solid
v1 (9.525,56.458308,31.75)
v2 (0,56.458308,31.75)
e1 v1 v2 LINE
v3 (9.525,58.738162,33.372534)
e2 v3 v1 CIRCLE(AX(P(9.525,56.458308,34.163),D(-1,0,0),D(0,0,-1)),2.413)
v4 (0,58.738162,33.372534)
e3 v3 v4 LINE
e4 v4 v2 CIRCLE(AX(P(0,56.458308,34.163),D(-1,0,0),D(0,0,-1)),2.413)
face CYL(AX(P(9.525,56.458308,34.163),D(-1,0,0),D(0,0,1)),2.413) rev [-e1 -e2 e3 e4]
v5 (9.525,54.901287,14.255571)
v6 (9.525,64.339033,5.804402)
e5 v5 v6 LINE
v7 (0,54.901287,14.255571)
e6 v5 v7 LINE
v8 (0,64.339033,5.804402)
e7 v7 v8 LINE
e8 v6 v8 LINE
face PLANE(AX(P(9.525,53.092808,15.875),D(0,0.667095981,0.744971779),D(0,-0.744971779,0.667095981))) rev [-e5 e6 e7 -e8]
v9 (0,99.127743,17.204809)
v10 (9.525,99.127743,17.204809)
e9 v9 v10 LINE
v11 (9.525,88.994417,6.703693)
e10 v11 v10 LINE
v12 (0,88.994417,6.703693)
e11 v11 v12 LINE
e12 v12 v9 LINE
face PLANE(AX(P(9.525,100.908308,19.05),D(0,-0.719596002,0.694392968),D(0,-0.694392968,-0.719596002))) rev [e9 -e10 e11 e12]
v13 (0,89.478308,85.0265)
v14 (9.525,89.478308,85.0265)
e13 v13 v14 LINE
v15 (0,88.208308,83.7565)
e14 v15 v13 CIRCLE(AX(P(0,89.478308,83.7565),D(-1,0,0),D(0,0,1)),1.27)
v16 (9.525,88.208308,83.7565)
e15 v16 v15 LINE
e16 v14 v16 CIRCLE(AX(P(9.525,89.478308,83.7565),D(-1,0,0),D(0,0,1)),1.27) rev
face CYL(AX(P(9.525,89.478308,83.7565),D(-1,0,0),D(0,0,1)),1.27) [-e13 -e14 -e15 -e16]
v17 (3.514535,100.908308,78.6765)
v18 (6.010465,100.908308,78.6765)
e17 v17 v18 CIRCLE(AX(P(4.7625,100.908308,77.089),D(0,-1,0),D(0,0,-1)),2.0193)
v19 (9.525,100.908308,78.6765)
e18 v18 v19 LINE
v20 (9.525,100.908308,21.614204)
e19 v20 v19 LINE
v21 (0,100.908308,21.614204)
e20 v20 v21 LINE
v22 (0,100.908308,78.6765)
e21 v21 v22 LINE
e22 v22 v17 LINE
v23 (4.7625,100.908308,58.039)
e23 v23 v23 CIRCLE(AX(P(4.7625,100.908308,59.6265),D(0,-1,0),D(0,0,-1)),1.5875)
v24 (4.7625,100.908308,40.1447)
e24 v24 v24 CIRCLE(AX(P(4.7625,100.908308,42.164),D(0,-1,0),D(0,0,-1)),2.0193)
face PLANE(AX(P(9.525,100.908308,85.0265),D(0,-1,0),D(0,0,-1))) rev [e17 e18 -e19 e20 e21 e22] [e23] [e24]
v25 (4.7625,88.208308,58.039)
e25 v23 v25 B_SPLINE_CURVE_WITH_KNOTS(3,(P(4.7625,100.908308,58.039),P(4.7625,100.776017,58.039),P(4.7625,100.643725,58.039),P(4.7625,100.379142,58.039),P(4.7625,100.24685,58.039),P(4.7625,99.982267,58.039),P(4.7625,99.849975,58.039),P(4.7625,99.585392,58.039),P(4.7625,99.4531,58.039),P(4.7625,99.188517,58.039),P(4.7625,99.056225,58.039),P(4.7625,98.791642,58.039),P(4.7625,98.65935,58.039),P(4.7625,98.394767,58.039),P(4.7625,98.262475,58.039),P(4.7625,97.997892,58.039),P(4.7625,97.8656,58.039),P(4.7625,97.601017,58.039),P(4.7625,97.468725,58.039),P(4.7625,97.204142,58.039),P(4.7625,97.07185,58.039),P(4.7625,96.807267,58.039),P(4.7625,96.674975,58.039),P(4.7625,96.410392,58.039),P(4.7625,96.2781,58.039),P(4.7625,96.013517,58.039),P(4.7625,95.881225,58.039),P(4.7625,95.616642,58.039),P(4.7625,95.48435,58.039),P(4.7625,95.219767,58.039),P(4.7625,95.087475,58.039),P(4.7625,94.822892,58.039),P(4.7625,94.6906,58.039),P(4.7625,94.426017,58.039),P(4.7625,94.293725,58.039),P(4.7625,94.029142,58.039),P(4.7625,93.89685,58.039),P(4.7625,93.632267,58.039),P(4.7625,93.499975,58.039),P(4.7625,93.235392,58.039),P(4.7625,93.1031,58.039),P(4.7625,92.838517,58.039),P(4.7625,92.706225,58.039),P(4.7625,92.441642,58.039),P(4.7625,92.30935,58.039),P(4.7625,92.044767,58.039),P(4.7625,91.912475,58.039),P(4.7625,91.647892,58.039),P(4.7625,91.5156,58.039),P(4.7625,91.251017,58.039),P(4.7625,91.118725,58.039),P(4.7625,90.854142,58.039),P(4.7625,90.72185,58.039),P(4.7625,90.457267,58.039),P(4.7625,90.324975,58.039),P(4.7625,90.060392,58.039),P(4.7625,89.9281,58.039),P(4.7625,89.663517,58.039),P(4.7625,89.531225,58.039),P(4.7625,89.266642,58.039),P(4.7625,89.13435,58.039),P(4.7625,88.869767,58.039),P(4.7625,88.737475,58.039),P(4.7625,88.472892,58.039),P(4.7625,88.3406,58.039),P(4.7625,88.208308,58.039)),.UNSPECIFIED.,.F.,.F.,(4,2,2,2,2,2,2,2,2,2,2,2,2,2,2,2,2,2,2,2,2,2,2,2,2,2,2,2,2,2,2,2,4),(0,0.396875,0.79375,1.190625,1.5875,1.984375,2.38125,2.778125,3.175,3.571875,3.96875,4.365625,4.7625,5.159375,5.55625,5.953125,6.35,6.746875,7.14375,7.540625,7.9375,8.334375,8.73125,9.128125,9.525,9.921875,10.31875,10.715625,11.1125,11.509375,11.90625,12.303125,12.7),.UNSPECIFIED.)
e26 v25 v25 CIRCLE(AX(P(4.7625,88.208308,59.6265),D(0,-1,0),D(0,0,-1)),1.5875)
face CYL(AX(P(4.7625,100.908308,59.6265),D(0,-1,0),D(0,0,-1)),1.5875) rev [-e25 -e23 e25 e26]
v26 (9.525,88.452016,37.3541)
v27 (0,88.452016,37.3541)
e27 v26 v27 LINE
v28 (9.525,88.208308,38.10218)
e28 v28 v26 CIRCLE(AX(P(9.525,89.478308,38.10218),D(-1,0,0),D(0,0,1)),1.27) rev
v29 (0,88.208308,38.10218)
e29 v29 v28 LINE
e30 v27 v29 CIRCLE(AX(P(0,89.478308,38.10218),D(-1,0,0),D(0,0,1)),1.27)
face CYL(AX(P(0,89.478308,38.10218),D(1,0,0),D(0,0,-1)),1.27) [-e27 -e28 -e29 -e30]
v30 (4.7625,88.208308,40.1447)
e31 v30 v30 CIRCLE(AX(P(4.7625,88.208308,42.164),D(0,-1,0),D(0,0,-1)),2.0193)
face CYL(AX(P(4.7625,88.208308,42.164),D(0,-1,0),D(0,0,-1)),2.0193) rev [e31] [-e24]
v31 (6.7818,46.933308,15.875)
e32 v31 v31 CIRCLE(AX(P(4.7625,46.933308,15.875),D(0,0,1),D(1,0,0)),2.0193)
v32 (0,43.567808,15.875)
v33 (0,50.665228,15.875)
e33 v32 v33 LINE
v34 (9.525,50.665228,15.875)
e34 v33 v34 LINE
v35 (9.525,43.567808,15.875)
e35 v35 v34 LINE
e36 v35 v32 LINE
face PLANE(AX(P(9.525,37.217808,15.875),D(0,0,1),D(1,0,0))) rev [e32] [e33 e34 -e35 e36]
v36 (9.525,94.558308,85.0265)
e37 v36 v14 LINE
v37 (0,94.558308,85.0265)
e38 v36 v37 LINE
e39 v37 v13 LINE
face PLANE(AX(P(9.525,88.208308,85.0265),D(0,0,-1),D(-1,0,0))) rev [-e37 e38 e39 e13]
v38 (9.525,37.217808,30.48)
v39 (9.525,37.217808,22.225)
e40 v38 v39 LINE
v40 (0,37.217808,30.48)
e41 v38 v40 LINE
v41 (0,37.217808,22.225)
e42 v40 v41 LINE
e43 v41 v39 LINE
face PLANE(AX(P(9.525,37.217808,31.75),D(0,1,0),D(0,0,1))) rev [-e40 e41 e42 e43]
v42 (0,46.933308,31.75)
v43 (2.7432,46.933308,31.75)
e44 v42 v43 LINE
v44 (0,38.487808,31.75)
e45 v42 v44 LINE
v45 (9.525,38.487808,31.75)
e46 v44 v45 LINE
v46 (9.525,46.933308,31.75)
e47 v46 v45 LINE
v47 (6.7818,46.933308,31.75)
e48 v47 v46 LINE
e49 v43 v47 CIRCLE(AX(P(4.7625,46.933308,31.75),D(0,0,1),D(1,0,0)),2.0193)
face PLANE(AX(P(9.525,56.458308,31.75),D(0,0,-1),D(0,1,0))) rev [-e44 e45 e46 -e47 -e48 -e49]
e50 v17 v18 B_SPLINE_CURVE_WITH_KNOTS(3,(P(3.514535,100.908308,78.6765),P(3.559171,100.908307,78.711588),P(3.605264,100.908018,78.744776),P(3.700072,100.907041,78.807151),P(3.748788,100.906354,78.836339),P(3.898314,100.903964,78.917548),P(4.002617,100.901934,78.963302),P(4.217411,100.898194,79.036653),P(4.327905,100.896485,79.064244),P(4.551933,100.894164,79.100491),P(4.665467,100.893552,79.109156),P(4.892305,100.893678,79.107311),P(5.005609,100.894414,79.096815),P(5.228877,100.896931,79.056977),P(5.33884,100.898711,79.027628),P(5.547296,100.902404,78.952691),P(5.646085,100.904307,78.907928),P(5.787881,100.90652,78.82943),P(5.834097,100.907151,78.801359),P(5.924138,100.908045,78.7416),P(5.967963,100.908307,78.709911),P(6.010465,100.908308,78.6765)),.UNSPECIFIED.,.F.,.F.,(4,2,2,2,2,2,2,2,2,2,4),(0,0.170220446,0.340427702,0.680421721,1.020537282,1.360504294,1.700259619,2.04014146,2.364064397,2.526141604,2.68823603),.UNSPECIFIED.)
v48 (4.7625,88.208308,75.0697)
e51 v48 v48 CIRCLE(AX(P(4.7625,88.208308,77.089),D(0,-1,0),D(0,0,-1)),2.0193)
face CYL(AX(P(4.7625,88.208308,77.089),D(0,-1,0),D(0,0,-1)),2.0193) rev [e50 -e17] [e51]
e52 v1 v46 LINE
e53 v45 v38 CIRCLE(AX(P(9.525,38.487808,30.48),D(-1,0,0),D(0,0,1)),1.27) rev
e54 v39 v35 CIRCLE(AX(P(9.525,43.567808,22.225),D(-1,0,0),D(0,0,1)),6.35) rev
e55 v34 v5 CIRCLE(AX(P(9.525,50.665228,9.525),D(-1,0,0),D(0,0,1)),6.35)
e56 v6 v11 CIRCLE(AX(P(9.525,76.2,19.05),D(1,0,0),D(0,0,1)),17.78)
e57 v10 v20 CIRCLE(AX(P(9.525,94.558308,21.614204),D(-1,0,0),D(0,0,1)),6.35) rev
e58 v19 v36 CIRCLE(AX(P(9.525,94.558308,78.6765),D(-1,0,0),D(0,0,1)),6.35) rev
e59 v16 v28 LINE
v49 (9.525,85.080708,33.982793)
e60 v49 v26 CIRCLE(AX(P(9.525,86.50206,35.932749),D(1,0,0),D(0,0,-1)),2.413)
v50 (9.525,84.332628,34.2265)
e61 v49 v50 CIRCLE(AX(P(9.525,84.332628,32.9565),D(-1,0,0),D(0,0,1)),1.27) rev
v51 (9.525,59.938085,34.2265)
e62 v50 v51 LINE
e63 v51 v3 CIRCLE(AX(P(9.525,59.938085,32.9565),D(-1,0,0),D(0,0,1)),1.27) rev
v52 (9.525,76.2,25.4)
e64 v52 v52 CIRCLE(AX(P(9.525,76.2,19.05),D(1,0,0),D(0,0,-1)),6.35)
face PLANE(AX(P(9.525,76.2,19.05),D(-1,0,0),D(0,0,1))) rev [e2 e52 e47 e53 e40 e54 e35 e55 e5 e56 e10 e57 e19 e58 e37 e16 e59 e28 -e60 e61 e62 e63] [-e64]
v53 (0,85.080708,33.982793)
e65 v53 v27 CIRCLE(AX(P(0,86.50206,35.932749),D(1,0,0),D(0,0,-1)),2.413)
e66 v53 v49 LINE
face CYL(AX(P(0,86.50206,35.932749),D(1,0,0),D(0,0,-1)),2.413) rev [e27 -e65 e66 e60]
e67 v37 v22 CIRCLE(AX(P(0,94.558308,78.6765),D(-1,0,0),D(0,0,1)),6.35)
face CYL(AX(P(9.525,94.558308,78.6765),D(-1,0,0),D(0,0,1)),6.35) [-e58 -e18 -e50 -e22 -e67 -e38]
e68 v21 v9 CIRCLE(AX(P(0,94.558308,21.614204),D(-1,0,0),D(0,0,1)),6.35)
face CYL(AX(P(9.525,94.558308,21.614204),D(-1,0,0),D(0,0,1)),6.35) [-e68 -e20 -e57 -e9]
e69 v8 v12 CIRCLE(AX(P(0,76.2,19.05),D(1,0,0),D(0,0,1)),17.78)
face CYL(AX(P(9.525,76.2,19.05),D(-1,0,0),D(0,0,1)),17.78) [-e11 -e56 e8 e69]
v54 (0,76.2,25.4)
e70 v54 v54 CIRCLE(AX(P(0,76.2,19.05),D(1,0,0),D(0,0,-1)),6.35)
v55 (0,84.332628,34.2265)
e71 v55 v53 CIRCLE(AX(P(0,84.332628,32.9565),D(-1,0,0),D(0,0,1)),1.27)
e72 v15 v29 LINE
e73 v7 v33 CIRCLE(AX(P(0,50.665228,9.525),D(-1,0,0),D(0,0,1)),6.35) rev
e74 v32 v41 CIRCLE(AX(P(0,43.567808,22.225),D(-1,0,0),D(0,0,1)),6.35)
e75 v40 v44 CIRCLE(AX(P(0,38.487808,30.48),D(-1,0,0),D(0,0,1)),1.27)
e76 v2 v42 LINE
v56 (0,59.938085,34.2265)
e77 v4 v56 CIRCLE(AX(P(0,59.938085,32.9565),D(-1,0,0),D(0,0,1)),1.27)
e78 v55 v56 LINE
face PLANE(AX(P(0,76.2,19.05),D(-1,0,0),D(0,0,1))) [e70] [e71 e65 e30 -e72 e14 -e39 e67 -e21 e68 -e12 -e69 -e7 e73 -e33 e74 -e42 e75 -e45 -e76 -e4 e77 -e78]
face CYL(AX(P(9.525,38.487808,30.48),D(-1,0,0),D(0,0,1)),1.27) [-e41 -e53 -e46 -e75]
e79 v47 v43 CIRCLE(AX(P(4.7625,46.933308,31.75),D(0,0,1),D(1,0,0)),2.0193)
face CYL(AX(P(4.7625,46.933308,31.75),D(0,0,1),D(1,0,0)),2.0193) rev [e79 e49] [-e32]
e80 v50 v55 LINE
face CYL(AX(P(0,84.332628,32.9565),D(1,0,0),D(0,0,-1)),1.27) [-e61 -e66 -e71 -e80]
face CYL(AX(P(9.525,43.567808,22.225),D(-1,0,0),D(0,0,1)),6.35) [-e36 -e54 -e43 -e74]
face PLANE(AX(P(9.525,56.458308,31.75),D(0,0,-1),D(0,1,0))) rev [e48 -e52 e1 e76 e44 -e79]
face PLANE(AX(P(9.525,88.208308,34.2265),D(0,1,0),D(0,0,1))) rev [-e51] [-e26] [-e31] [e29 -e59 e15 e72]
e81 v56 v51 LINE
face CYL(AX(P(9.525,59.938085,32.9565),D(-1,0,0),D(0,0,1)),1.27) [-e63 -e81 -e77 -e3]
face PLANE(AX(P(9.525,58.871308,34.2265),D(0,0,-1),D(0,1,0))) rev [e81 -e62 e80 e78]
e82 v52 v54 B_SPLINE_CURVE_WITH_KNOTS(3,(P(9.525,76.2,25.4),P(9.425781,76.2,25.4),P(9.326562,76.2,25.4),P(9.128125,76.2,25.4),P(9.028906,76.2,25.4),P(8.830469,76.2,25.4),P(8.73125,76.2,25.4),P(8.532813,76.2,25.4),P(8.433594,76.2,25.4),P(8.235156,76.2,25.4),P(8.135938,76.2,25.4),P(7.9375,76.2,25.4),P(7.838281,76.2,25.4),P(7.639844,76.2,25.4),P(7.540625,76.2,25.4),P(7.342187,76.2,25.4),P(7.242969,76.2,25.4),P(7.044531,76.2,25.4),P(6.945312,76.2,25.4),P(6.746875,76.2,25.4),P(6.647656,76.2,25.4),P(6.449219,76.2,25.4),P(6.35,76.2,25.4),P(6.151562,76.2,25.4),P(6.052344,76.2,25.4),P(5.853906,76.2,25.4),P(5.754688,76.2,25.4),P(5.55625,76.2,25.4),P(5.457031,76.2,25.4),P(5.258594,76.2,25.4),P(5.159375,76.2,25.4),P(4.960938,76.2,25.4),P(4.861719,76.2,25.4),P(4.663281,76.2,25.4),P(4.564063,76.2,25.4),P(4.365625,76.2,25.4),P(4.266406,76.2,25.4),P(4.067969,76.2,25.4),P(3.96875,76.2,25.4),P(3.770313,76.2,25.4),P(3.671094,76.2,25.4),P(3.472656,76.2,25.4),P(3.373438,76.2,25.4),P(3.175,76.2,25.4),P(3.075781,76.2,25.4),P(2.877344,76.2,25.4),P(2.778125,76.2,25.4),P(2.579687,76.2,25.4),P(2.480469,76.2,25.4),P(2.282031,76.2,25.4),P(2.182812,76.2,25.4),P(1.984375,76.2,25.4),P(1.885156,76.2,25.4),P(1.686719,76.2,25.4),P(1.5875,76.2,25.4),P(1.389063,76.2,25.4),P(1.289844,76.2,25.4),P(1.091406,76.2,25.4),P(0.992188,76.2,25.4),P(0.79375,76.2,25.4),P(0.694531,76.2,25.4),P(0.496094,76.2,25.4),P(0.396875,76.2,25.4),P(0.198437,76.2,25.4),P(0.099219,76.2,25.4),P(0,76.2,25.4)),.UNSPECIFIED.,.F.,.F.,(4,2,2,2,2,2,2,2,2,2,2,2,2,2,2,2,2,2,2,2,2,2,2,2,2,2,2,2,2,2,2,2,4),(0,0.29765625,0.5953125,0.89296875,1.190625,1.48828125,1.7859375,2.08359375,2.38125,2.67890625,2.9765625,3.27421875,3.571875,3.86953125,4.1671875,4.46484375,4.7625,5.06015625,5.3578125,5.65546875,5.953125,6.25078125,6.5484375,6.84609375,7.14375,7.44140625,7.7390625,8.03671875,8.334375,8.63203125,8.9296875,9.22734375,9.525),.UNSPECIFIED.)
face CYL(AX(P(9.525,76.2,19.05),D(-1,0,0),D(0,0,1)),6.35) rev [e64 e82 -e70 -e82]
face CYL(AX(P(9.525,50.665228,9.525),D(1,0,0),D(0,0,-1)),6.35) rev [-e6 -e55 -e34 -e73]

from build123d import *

# Parameters (mm, degrees)
SKETCH1_R              = 6.35
BOSS_EXTRUDE1_DEPTH    = 9.525
SKETCH2_R              = 2.413
CUT_EXTRUDE1_DEPTH     = 133.297838401
F_10_32_TAPPED_HOLE2_D = 4.0386
F_10_32_TAPPED_HOLE3_D = 4.0386
FILLET2_R              = 6.35
FILLET3_R              = 1.27
SKETCH15_R             = 1.5875
DOWEL_PIN_HOLE_DEPTH   = 100.600514289


with BuildPart() as part:
    # Sketch1 → Boss-Extrude1 (new body)
    with BuildSketch(Plane(origin=(0, 0, 0), x_dir=(0, 0, -1), z_dir=(1, 0, 0))):
        with BuildLine():
            Line((-85.0265, 88.20830847), (-85.0265, 100.90830847))
            Line((-85.0265, 100.90830847), (-19.05, 100.90830847))
            Line((-19.05, 100.90830847), (-6.703693037, 88.994416922))
            ThreePointArc((-6.703693037, 88.994416922), (-1.281815332, 76.848084565), (-5.804401761, 64.339033459))
            Line((-5.804401761, 64.339033459), (-15.875, 53.09280847))
            Line((-15.875, 53.09280847), (-15.875, 37.21780847))
            Line((-15.875, 37.21780847), (-31.75, 37.21780847))
            Line((-31.75, 37.21780847), (-31.75, 56.45830847))
            ThreePointArc((-31.75, 56.45830847), (-32.456751337, 58.164557133), (-34.163, 58.87130847))
            Line((-34.163, 58.87130847), (-34.2265, 58.87130847))
            Line((-34.2265, 58.87130847), (-34.2265, 88.20830847))
            Line((-34.2265, 88.20830847), (-85.0265, 88.20830847))
        make_face()
        with Locations(Location((-19.05, 76.2, 0), (0, 0, 180))):
            Circle(SKETCH1_R, mode=Mode.SUBTRACT)
    extrude(amount=BOSS_EXTRUDE1_DEPTH)

    # Sketch2 → Cut-Extrude1 (cut, through all)
    with BuildSketch(Plane(origin=(9.525, 0, 0), x_dir=(0, 0, -1), z_dir=(1, 0, 0))):
        with Locations((-35.932748663, 86.502059807)):
            Circle(SKETCH2_R)
    extrude(amount=-CUT_EXTRUDE1_DEPTH, mode=Mode.SUBTRACT)

    # #10-32 Tapped Hole2 (through all)
    with Locations(Plane(origin=(0, 88.20830847, 0), x_dir=(-1, 0, 0), z_dir=(0, -1, 0))):
        with Locations((-4.7625, -42.164), (-4.7625, -77.089)):
            Hole(F_10_32_TAPPED_HOLE2_D / 2)

    # #10-32 Tapped Hole3 (through all)
    with Locations(Plane.XY.offset(31.75)):
        with Locations((4.7625, 46.93330847)):
            Hole(F_10_32_TAPPED_HOLE3_D / 2)

    # Fillet2
    # the kernel refuses this fillet: 6.35 mm, written as the material it adds along each edge
    with BuildSketch(Plane(origin=(0, 53.09280847, 15.875), x_dir=(0, 0.7449717794882204, -0.6670959809248997), z_dir=(1, 0, 0))) as fillet2_piece_1:
        with BuildLine():
            CenterArc((FILLET2_R * 0.38229614299, -FILLET2_R), FILLET2_R, 90, 41.843324942)
            Line((-FILLET2_R * 0.284799837935, -FILLET2_R * 0.255028220512), (0, 0))
            Line((0, 0), (FILLET2_R * 0.38229614299, 0))
        make_face()
    extrude(amount=9.525)
    # the kernel refuses this fillet: 6.35 mm, written as the material it takes off along each edge
    with BuildSketch(Plane(origin=(-15.875, 100.90830847, 85.0265), x_dir=(0, -1, 0), z_dir=(1, 0, 0))) as fillet2_2_piece_1:
        with BuildLine():
            CenterArc((FILLET2_R, FILLET2_R), FILLET2_R, 180, 90)
            Line((0, FILLET2_R), (0, 0))
            Line((0, 0), (FILLET2_R, 0))
        make_face()
    extrude(amount=41.275, mode=Mode.SUBTRACT)
    with BuildSketch(Plane(origin=(-6.410510576, 100.90830847, 19.05), x_dir=(0, 0, 1), z_dir=(1, 0, 0))) as fillet2_2_piece_2:
        with BuildLine():
            CenterArc((FILLET2_R * 0.403811689842, FILLET2_R), FILLET2_R, 226.021135711, 43.978864289)
            Line((-FILLET2_R * 0.290581277715, FILLET2_R * 0.280403997644), (0, 0))
            Line((0, 0), (FILLET2_R * 0.403811689842, 0))
        make_face()
    extrude(amount=22.346021152, mode=Mode.SUBTRACT)
    with BuildSketch(Plane(origin=(-15.875, 37.21780847, 15.875), x_dir=(0, 0, 1), z_dir=(1, 0, 0))) as fillet2_2_piece_3:
        with BuildLine():
            CenterArc((FILLET2_R, -FILLET2_R), FILLET2_R, 90, 90)
            Line((0, -FILLET2_R), (0, 0))
            Line((0, 0), (FILLET2_R, 0))
        make_face()
    extrude(amount=41.275, mode=Mode.SUBTRACT)

    # Fillet3
    fillet3_edges = [part.edges().sort_by_distance(p)[0] for p in [
        (4.7625, 37.21780847, 31.75),
        (4.7625, 58.87130847, 34.2265),
        (4.7625, 88.20830847, 85.0265),
        (4.7625, 84.795811144, 34.2265),
        (4.7625, 88.20830847, 37.638997326),
    ]]
    fillet(fillet3_edges, radius=FILLET3_R)

    # Sketch15 → Dowel Pin hole (cut, through all)
    with BuildSketch(Plane.XZ.offset(-88.20830847)):
        with Locations(Location((4.7625, 59.6265, 0), (0, 0, 270))):
            Circle(SKETCH15_R)
    extrude(amount=-DOWEL_PIN_HOLE_DEPTH, mode=Mode.SUBTRACT)


solid = part.part
